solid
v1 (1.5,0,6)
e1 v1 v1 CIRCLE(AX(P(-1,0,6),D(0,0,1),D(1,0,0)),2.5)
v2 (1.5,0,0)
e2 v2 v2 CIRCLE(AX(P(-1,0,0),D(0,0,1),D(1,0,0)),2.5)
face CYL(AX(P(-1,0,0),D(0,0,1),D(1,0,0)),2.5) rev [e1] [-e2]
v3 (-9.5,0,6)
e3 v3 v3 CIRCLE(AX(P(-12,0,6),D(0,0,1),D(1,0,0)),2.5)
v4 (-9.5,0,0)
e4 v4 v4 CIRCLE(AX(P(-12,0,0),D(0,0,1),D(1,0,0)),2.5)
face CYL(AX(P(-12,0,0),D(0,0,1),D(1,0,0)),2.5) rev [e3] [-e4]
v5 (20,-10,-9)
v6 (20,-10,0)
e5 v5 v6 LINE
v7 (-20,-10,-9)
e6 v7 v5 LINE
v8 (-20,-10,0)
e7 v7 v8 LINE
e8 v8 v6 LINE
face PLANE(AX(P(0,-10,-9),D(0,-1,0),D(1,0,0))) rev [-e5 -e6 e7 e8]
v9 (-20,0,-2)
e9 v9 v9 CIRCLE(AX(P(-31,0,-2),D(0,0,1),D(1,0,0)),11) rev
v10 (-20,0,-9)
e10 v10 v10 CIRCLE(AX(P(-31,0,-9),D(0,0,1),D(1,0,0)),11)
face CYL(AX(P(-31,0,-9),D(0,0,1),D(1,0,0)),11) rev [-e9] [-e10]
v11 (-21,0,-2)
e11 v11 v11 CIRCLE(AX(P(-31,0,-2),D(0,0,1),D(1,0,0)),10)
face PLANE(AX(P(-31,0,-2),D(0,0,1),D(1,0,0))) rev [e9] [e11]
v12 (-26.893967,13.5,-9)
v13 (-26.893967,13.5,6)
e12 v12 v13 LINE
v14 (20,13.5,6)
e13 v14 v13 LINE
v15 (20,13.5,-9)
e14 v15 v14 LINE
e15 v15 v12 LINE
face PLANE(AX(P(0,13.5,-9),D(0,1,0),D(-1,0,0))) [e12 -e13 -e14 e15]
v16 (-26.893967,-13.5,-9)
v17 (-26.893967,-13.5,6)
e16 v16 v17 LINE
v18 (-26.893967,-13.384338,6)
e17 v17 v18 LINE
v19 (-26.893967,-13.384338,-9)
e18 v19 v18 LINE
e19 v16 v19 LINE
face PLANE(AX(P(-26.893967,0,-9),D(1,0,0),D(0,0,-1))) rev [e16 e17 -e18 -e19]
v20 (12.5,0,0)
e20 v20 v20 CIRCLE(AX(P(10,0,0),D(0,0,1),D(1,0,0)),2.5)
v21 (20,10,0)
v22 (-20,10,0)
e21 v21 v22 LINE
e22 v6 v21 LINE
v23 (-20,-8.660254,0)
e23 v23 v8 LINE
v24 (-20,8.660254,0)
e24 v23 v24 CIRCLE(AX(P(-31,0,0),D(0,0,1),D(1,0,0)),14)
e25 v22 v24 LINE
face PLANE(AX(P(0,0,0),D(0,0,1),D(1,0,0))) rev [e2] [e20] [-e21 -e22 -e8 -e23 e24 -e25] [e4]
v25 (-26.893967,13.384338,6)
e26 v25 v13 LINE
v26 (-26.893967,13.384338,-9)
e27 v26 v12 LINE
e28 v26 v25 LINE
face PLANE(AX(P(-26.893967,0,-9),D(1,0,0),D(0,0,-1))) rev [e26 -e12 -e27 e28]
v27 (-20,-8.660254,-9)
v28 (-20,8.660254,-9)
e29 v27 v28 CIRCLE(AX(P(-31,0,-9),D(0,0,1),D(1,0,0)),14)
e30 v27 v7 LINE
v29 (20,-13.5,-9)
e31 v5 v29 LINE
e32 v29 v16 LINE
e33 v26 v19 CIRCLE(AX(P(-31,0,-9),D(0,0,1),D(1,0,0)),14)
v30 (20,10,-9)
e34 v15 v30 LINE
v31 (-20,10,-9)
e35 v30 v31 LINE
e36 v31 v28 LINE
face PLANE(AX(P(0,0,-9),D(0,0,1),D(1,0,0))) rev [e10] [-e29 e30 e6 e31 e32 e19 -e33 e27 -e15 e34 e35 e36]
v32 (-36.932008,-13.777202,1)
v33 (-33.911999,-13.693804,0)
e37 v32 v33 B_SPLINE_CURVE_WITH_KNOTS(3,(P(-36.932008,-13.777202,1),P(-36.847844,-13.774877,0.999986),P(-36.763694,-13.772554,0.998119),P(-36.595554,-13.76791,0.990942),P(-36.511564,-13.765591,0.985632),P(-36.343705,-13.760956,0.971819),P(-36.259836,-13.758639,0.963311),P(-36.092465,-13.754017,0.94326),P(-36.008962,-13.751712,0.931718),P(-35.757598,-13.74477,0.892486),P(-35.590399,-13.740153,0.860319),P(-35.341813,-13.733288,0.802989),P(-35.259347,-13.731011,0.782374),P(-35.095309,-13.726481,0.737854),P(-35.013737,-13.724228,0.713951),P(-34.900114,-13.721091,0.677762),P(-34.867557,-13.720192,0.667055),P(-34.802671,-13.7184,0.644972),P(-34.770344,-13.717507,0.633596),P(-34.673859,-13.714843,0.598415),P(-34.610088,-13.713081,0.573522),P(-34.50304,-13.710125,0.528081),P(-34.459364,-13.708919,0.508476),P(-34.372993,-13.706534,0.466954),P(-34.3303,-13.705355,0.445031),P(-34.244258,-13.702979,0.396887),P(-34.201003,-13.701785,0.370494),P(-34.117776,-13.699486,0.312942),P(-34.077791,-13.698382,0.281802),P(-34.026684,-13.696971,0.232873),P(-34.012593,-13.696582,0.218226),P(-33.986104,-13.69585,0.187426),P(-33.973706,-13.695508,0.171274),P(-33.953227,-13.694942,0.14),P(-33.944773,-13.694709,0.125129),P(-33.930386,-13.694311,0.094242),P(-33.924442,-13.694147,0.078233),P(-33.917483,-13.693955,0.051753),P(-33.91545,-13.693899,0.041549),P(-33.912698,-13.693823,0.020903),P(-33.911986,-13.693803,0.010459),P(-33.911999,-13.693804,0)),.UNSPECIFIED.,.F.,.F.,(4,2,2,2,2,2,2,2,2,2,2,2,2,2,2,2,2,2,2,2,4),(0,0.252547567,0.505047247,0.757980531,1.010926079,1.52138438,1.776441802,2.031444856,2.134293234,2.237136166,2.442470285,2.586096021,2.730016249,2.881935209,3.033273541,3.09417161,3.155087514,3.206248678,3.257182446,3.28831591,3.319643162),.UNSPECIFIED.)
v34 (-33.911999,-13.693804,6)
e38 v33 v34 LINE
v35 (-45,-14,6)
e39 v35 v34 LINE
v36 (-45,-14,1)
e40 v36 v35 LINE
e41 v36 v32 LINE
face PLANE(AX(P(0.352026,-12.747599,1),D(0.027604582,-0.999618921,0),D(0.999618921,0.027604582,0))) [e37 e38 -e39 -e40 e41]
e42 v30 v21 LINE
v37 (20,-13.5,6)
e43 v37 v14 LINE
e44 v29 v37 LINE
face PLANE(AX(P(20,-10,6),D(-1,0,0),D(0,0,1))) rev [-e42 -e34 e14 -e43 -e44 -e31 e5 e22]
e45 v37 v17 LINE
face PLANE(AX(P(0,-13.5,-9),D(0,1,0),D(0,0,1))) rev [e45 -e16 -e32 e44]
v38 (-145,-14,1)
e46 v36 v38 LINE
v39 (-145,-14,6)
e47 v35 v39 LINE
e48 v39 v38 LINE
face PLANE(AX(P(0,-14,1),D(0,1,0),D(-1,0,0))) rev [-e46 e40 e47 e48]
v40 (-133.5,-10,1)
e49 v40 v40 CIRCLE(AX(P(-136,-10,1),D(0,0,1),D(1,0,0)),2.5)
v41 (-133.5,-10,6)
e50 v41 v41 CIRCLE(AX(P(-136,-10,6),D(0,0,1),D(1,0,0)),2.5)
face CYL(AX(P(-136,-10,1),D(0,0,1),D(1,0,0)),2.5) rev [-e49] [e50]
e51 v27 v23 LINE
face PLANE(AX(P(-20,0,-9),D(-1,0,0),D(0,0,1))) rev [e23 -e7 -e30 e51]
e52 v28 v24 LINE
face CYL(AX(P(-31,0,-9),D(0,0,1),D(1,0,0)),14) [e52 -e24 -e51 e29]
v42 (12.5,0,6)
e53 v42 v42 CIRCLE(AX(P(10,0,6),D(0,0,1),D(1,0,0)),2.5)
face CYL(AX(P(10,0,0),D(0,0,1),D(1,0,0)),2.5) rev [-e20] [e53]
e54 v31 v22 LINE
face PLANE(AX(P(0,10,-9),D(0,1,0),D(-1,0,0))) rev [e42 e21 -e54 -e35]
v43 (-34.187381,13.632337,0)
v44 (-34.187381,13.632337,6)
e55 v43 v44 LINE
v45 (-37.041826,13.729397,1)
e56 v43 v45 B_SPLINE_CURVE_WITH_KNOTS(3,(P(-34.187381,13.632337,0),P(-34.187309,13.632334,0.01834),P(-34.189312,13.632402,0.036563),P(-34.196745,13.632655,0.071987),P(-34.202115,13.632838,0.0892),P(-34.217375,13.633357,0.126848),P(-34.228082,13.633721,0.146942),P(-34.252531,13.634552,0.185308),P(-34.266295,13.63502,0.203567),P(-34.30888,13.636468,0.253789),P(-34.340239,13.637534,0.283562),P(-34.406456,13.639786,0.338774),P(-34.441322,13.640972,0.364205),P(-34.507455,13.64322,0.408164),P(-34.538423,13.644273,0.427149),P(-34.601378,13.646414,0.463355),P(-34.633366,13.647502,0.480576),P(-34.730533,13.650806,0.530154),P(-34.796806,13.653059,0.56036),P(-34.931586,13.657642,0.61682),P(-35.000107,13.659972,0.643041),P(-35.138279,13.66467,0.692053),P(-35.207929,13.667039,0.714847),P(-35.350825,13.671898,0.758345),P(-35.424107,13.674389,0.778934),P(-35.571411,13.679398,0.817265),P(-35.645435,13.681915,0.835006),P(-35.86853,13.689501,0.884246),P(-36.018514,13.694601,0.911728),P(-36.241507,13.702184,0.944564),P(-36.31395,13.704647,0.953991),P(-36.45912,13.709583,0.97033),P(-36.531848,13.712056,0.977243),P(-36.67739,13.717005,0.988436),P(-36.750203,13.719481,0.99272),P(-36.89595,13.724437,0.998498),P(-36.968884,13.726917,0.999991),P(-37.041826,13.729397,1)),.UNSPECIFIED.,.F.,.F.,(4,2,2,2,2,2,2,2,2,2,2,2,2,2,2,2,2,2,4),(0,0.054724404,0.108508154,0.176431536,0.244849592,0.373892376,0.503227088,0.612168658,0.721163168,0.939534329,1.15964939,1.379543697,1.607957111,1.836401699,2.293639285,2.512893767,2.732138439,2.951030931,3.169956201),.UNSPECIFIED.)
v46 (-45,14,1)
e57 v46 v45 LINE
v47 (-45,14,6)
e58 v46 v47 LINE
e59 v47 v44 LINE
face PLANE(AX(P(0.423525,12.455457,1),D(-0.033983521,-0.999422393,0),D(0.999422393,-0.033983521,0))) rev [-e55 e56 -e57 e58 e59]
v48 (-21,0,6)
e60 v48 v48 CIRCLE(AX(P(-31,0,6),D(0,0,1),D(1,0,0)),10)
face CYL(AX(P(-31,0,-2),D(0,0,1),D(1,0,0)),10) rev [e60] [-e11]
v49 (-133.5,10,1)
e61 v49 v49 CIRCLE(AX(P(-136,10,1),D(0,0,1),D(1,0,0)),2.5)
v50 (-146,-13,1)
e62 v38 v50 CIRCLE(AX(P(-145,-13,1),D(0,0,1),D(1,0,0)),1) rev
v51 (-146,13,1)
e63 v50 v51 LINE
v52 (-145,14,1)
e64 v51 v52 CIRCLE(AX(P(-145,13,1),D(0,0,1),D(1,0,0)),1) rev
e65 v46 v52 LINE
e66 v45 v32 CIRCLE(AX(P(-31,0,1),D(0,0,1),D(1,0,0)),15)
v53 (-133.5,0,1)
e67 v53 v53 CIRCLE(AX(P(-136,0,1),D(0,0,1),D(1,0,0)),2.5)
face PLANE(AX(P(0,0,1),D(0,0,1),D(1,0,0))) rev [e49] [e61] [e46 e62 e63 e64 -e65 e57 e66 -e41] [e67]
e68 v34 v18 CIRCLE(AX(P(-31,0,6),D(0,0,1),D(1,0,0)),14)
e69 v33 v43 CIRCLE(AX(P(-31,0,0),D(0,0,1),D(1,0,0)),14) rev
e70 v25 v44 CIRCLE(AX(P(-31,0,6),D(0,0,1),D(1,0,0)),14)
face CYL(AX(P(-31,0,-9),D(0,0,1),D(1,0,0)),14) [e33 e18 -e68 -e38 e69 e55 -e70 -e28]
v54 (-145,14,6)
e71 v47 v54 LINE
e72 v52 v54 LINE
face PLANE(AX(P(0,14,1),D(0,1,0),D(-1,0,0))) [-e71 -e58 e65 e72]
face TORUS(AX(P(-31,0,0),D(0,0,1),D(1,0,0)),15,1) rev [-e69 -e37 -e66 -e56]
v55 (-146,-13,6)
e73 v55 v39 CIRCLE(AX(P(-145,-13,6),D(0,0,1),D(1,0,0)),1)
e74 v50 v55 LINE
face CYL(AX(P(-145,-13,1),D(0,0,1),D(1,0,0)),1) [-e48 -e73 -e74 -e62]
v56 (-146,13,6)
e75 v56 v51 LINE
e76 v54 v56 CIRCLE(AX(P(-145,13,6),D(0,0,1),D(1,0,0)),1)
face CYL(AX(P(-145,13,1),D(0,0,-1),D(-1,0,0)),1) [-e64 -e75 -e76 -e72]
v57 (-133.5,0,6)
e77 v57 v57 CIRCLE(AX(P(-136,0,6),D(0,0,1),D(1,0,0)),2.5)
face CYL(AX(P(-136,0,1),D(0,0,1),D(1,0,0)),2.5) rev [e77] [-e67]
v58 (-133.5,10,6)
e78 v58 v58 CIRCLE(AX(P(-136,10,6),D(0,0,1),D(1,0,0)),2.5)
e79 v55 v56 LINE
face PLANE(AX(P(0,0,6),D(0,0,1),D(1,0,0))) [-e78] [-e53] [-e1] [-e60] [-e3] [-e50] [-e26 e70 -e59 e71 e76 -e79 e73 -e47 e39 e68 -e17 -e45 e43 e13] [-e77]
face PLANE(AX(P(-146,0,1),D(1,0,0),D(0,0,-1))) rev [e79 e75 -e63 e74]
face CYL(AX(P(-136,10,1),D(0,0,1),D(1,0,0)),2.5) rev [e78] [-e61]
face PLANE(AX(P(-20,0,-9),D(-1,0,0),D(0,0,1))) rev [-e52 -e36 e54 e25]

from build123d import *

# Parameters (mm, degrees)
SKETCH_1_W          = 40
SKETCH_1_H          = 20
EXTRUDE_1_DEPTH     = 6
SKETCH_2_R          = 2.5
CUT_EXTRUDE_1_DEPTH = 24.151673806
SKETCH_3_R          = 11
EXTRUDE_2_DEPTH     = 15
SKETCH_5_R          = 11
SKETCH_5_R_2        = 10
EXTRUDE_3_DEPTH     = 8
EXTRUDE_4_DEPTH     = 5
FILLET_1_R          = 1
FILLET_2_R          = 1
SKETCH_9_R          = 2.5
CUT_EXTRUDE_2_DEPTH = 5


with BuildPart() as part:
    # 草图1 → 凸台-拉伸1 (new body)
    with BuildSketch(Plane.XY):
        Rectangle(SKETCH_1_W, SKETCH_1_H)
    extrude(amount=EXTRUDE_1_DEPTH)

    # 草图2 → 切除-拉伸1 (cut, through all)
    with BuildSketch(Plane.XY.offset(6)):
        with Locations((10, 0)):
            Circle(SKETCH_2_R)
        with Locations((-1, 0)):
            Circle(SKETCH_2_R)
        with Locations((-12, 0)):
            Circle(SKETCH_2_R)
    extrude(amount=-CUT_EXTRUDE_1_DEPTH, mode=Mode.SUBTRACT)

    # 草图3 → 凸台-拉伸2 (add)
    with BuildSketch(Plane.XY.offset(6)):
        with BuildLine():
            Line((20, 10), (20, 13.5))
            Line((20, 13.5), (-26.893967141, 13.5))
            Line((-26.893967141, 13.5), (-26.893967141, 13.384337644))
            ThreePointArc((-26.893967141, 13.384337644), (-45, 0), (-26.893967141, -13.384337644))
            Line((-26.893967141, -13.384337644), (-26.893967141, -13.5))
            Line((-26.893967141, -13.5), (20, -13.5))
            Line((20, -13.5), (20, -10))
            Line((20, -10), (-20, -10))
            Line((-20, -10), (-20, -8.660254038))
            ThreePointArc((-20, -8.660254038), (-17, 0), (-20, 8.660254038))
            Line((-20, 8.660254038), (-20, 10))
            Line((-20, 10), (20, 10))
        make_face()
        with Locations((-31, 0)):
            Circle(SKETCH_3_R, mode=Mode.SUBTRACT)
    extrude(amount=-EXTRUDE_2_DEPTH)

    # 草图5 → 凸台-拉伸3 (add)
    with BuildSketch(Plane.XY.offset(6)):
        with Locations((-31, 0)):
            Circle(SKETCH_5_R)
        with Locations((-31, 0)):
            Circle(SKETCH_5_R_2, mode=Mode.SUBTRACT)
    extrude(amount=-EXTRUDE_3_DEPTH)

    # 草图8 → 凸台-拉伸4 (add)
    with BuildSketch(Plane.XY.offset(6)):
        with BuildLine():
            ThreePointArc((-33.911999365, -13.693803697), (-44.999289152, -0.141078849), (-34.187380521, 13.632336755))
            Line((-34.187380521, 13.632336755), (-45, 14))
            Line((-45, 14), (-146, 14))
            Line((-146, 14), (-146, -14))
            Line((-146, -14), (-45, -14))
            Line((-45, -14), (-33.911999365, -13.693803697))
        make_face()
    extrude(amount=-EXTRUDE_4_DEPTH)

    # 圆角1
    fillet_1_edges = [part.edges().sort_by_distance(p)[0] for p in [
        (-44.999289152, -0.141078849, 1),
    ]]
    fillet(fillet_1_edges, radius=FILLET_1_R)

    # 圆角2
    fillet_2_edges = [part.edges().sort_by_distance(p)[0] for p in [
        (-146, 14, 3.5),
        (-146, -14, 3.5),
    ]]
    fillet(fillet_2_edges, radius=FILLET_2_R)

    # 草图9 → 切除-拉伸2 (cut)
    with BuildSketch(Plane.XY.offset(6)):
        with Locations((-136, 0)):
            Circle(SKETCH_9_R)
        with Locations((-136, 10)):
            Circle(SKETCH_9_R)
        with Locations((-136, -10)):
            Circle(SKETCH_9_R)
    extrude(amount=-CUT_EXTRUDE_2_DEPTH, mode=Mode.SUBTRACT)


solid = part.part
